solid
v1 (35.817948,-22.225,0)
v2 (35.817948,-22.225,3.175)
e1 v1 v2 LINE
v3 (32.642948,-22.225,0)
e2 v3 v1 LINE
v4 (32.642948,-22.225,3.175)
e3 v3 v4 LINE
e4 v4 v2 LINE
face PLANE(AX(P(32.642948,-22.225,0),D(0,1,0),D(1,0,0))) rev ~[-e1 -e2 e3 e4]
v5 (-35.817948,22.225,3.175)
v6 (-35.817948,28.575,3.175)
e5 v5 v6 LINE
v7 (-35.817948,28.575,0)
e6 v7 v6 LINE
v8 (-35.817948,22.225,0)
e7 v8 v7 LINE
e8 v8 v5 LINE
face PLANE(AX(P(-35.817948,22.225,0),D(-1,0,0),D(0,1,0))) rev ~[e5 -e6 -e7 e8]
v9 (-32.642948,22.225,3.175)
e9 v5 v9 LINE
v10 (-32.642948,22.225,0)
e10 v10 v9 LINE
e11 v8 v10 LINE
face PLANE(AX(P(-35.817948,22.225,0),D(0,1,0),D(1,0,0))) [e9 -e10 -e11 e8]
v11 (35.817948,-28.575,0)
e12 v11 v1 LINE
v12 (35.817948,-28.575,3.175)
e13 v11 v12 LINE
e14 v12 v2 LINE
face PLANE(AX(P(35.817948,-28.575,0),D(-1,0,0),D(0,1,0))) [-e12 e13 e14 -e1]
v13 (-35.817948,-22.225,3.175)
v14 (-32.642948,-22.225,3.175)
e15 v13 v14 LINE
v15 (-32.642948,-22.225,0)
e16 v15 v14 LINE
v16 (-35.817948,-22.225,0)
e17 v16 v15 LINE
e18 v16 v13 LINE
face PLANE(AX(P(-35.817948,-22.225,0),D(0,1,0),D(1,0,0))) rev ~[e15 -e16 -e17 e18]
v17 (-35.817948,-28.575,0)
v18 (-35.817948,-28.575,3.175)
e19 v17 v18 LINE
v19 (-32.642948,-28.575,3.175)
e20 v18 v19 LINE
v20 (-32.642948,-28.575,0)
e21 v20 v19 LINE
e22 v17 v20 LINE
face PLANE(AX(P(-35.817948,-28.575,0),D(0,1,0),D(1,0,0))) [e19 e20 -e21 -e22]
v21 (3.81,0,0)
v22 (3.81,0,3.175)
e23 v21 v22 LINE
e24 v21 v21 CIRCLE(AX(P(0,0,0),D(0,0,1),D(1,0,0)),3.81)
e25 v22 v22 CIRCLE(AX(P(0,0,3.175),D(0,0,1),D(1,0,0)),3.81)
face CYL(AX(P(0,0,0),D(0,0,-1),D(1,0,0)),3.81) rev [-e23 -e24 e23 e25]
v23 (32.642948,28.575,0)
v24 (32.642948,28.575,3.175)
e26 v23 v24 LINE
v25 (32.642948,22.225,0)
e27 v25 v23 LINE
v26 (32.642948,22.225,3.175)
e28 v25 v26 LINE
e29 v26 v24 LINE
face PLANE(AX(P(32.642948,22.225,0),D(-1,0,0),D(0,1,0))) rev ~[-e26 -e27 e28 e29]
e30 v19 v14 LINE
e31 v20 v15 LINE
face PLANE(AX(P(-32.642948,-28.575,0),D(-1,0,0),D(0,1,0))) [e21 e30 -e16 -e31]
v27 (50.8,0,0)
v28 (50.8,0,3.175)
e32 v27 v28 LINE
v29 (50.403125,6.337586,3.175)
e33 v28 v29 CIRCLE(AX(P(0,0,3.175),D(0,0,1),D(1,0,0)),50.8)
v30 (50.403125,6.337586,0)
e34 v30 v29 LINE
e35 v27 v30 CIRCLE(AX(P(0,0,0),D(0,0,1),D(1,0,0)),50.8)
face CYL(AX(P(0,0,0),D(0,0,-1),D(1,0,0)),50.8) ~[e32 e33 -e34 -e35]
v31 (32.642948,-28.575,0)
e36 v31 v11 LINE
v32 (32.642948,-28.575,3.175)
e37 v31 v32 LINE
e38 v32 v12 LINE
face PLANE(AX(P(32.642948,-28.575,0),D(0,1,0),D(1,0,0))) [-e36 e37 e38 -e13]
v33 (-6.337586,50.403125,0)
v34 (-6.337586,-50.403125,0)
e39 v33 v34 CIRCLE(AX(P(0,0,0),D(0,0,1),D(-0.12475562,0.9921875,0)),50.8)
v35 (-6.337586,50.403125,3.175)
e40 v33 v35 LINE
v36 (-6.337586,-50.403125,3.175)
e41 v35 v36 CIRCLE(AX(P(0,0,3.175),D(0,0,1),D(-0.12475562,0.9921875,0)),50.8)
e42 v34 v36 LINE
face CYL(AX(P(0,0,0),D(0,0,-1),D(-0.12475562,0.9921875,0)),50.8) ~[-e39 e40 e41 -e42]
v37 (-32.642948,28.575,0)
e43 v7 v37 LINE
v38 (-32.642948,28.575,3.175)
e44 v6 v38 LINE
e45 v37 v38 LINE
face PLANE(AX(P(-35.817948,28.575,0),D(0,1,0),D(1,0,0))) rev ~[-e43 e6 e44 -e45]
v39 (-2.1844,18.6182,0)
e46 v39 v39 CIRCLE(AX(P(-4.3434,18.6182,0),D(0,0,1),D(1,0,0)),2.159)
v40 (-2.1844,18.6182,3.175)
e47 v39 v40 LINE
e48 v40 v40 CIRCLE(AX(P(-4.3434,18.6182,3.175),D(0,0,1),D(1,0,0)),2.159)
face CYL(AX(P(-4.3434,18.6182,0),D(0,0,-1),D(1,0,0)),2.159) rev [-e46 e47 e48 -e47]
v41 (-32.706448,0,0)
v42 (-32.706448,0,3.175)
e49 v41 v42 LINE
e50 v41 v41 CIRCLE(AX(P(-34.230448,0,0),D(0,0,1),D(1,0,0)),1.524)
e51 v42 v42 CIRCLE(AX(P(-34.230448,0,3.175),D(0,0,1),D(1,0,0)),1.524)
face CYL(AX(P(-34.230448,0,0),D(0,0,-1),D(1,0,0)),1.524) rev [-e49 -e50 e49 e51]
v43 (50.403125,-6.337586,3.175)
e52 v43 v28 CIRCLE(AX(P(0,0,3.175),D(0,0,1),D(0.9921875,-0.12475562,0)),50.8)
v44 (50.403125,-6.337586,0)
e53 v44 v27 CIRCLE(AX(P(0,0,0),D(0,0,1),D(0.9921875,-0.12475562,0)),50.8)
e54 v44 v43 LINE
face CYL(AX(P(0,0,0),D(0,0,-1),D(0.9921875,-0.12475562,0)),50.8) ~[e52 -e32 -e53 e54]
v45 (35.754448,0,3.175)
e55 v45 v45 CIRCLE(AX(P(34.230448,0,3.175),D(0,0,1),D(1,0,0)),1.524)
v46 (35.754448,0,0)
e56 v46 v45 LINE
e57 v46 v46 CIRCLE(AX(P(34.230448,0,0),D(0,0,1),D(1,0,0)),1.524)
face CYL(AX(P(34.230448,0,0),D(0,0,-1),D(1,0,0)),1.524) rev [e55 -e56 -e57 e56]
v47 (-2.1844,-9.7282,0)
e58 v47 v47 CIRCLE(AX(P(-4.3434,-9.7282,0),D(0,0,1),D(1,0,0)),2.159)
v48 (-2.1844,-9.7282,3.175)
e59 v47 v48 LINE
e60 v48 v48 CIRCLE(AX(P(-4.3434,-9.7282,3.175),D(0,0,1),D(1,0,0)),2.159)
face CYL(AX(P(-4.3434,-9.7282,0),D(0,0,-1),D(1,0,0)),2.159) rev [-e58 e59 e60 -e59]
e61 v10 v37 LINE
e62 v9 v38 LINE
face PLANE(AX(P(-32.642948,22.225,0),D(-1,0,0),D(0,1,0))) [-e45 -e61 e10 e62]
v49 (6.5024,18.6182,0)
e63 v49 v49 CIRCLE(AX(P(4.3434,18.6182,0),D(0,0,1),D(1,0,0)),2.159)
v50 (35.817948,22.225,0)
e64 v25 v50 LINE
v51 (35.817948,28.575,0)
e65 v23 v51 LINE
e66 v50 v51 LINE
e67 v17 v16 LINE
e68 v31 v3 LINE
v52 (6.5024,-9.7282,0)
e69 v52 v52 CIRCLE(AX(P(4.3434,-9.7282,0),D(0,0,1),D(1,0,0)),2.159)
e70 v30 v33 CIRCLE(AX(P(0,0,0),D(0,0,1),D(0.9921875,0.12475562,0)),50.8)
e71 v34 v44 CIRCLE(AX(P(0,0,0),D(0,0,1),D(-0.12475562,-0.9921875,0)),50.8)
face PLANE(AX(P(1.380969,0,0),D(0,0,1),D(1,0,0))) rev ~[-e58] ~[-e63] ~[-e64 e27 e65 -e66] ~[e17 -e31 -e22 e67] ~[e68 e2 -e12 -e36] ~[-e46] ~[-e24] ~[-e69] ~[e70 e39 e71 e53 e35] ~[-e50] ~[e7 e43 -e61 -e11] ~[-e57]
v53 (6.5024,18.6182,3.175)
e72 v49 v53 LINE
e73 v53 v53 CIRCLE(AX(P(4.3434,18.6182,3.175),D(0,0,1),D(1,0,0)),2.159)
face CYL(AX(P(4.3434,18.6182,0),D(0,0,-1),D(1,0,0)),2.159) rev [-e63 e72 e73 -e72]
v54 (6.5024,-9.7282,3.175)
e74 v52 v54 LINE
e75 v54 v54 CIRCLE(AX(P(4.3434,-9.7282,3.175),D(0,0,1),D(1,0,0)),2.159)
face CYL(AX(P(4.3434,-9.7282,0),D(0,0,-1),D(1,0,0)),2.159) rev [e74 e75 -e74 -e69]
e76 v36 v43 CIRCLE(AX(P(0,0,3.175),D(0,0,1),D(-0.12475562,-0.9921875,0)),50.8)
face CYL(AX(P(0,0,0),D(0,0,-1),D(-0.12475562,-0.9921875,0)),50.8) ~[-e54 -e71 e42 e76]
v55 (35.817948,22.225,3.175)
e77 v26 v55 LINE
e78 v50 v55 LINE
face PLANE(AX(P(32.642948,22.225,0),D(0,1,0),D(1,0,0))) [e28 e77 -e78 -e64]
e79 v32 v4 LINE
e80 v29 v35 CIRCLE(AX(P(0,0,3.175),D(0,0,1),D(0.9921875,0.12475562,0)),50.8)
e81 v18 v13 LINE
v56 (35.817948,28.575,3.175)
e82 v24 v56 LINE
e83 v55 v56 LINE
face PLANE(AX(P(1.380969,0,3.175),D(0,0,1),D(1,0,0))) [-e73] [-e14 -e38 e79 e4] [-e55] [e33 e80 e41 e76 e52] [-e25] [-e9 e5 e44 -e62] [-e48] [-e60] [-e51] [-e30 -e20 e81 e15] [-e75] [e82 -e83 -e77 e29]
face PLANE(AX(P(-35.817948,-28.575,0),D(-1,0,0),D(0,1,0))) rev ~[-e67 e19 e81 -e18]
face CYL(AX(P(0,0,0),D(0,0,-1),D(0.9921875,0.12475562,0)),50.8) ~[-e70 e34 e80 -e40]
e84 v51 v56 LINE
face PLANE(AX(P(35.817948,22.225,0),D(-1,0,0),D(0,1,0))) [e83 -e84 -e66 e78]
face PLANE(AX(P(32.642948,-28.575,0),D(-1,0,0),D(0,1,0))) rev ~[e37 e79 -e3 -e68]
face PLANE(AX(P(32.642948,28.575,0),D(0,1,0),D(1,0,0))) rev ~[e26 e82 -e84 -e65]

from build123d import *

# Parameters (mm, degrees)
F0_W     = 3.175
F0_H     = 6.35
F0_R     = 1.524
F0_R_2   = 2.159
F0_R_3   = 3.81
F1_DEPTH = 3.175


# Not quite as in the source:
# - a length typed as a fraction of an inch, garbled in the dataset ("3 / 203.2 mm" for 3/8 in), is restored


with BuildPart() as f1:
    # F0 (on Top) → F1 (new body)
    with BuildSketch(Plane.XY):
        with BuildLine():
            ThreePointArc((-50.403125, 6.3375855209), (-50.8, 0), (-50.403125, -6.3375855209))
            ThreePointArc((-50.403125, -6.3375855209), (-35.9210244843, -35.9210244843), (-6.3375855209, -50.403125))
            ThreePointArc((-6.3375855209, -50.403125), (0, -50.8), (6.3375855209, -50.403125))
            ThreePointArc((6.3375855209, -50.403125), (35.9210244843, -35.9210244843), (50.403125, -6.3375855209))
            ThreePointArc((50.403125, -6.3375855209), (50.700684167, -3.175), (50.8, 0))
            ThreePointArc((50.8, 0), (50.700684167, 3.175), (50.403125, 6.3375855209))
            ThreePointArc((50.403125, 6.3375855209), (35.9210244843, 35.9210244843), (6.3375855209, 50.403125))
            ThreePointArc((6.3375855209, 50.403125), (0, 50.8), (-6.3375855209, 50.403125))
            ThreePointArc((-6.3375855209, 50.403125), (-35.9210244843, 35.9210244843), (-50.403125, 6.3375855209))
        make_face()
        with Locations((-34.2304483056, -25.4)):
            Rectangle(F0_W, F0_H, mode=Mode.SUBTRACT)
        with Locations((-34.2304483056, 0)):
            Circle(F0_R, mode=Mode.SUBTRACT)
        with Locations((-4.3434, -9.7282)):
            Circle(F0_R_2, mode=Mode.SUBTRACT)
        Circle(F0_R_3, mode=Mode.SUBTRACT)
        with Locations((34.2304483056, -25.4)):
            Rectangle(F0_W, F0_H, mode=Mode.SUBTRACT)
        with Locations((4.3434, -9.7282)):
            Circle(F0_R_2, mode=Mode.SUBTRACT)
        with Locations((34.2304483056, 0)):
            Circle(F0_R, mode=Mode.SUBTRACT)
        with Locations((-34.2304483056, 25.4)):
            Rectangle(F0_W, F0_H, mode=Mode.SUBTRACT)
        with Locations((-4.3434, 18.6182)):
            Circle(F0_R_2, mode=Mode.SUBTRACT)
        with Locations((4.3434, 18.6182)):
            Circle(F0_R_2, mode=Mode.SUBTRACT)
        with Locations((34.2304483056, 25.4)):
            Rectangle(F0_W, F0_H, mode=Mode.SUBTRACT)
    extrude(amount=F1_DEPTH)


solid = f1.part
